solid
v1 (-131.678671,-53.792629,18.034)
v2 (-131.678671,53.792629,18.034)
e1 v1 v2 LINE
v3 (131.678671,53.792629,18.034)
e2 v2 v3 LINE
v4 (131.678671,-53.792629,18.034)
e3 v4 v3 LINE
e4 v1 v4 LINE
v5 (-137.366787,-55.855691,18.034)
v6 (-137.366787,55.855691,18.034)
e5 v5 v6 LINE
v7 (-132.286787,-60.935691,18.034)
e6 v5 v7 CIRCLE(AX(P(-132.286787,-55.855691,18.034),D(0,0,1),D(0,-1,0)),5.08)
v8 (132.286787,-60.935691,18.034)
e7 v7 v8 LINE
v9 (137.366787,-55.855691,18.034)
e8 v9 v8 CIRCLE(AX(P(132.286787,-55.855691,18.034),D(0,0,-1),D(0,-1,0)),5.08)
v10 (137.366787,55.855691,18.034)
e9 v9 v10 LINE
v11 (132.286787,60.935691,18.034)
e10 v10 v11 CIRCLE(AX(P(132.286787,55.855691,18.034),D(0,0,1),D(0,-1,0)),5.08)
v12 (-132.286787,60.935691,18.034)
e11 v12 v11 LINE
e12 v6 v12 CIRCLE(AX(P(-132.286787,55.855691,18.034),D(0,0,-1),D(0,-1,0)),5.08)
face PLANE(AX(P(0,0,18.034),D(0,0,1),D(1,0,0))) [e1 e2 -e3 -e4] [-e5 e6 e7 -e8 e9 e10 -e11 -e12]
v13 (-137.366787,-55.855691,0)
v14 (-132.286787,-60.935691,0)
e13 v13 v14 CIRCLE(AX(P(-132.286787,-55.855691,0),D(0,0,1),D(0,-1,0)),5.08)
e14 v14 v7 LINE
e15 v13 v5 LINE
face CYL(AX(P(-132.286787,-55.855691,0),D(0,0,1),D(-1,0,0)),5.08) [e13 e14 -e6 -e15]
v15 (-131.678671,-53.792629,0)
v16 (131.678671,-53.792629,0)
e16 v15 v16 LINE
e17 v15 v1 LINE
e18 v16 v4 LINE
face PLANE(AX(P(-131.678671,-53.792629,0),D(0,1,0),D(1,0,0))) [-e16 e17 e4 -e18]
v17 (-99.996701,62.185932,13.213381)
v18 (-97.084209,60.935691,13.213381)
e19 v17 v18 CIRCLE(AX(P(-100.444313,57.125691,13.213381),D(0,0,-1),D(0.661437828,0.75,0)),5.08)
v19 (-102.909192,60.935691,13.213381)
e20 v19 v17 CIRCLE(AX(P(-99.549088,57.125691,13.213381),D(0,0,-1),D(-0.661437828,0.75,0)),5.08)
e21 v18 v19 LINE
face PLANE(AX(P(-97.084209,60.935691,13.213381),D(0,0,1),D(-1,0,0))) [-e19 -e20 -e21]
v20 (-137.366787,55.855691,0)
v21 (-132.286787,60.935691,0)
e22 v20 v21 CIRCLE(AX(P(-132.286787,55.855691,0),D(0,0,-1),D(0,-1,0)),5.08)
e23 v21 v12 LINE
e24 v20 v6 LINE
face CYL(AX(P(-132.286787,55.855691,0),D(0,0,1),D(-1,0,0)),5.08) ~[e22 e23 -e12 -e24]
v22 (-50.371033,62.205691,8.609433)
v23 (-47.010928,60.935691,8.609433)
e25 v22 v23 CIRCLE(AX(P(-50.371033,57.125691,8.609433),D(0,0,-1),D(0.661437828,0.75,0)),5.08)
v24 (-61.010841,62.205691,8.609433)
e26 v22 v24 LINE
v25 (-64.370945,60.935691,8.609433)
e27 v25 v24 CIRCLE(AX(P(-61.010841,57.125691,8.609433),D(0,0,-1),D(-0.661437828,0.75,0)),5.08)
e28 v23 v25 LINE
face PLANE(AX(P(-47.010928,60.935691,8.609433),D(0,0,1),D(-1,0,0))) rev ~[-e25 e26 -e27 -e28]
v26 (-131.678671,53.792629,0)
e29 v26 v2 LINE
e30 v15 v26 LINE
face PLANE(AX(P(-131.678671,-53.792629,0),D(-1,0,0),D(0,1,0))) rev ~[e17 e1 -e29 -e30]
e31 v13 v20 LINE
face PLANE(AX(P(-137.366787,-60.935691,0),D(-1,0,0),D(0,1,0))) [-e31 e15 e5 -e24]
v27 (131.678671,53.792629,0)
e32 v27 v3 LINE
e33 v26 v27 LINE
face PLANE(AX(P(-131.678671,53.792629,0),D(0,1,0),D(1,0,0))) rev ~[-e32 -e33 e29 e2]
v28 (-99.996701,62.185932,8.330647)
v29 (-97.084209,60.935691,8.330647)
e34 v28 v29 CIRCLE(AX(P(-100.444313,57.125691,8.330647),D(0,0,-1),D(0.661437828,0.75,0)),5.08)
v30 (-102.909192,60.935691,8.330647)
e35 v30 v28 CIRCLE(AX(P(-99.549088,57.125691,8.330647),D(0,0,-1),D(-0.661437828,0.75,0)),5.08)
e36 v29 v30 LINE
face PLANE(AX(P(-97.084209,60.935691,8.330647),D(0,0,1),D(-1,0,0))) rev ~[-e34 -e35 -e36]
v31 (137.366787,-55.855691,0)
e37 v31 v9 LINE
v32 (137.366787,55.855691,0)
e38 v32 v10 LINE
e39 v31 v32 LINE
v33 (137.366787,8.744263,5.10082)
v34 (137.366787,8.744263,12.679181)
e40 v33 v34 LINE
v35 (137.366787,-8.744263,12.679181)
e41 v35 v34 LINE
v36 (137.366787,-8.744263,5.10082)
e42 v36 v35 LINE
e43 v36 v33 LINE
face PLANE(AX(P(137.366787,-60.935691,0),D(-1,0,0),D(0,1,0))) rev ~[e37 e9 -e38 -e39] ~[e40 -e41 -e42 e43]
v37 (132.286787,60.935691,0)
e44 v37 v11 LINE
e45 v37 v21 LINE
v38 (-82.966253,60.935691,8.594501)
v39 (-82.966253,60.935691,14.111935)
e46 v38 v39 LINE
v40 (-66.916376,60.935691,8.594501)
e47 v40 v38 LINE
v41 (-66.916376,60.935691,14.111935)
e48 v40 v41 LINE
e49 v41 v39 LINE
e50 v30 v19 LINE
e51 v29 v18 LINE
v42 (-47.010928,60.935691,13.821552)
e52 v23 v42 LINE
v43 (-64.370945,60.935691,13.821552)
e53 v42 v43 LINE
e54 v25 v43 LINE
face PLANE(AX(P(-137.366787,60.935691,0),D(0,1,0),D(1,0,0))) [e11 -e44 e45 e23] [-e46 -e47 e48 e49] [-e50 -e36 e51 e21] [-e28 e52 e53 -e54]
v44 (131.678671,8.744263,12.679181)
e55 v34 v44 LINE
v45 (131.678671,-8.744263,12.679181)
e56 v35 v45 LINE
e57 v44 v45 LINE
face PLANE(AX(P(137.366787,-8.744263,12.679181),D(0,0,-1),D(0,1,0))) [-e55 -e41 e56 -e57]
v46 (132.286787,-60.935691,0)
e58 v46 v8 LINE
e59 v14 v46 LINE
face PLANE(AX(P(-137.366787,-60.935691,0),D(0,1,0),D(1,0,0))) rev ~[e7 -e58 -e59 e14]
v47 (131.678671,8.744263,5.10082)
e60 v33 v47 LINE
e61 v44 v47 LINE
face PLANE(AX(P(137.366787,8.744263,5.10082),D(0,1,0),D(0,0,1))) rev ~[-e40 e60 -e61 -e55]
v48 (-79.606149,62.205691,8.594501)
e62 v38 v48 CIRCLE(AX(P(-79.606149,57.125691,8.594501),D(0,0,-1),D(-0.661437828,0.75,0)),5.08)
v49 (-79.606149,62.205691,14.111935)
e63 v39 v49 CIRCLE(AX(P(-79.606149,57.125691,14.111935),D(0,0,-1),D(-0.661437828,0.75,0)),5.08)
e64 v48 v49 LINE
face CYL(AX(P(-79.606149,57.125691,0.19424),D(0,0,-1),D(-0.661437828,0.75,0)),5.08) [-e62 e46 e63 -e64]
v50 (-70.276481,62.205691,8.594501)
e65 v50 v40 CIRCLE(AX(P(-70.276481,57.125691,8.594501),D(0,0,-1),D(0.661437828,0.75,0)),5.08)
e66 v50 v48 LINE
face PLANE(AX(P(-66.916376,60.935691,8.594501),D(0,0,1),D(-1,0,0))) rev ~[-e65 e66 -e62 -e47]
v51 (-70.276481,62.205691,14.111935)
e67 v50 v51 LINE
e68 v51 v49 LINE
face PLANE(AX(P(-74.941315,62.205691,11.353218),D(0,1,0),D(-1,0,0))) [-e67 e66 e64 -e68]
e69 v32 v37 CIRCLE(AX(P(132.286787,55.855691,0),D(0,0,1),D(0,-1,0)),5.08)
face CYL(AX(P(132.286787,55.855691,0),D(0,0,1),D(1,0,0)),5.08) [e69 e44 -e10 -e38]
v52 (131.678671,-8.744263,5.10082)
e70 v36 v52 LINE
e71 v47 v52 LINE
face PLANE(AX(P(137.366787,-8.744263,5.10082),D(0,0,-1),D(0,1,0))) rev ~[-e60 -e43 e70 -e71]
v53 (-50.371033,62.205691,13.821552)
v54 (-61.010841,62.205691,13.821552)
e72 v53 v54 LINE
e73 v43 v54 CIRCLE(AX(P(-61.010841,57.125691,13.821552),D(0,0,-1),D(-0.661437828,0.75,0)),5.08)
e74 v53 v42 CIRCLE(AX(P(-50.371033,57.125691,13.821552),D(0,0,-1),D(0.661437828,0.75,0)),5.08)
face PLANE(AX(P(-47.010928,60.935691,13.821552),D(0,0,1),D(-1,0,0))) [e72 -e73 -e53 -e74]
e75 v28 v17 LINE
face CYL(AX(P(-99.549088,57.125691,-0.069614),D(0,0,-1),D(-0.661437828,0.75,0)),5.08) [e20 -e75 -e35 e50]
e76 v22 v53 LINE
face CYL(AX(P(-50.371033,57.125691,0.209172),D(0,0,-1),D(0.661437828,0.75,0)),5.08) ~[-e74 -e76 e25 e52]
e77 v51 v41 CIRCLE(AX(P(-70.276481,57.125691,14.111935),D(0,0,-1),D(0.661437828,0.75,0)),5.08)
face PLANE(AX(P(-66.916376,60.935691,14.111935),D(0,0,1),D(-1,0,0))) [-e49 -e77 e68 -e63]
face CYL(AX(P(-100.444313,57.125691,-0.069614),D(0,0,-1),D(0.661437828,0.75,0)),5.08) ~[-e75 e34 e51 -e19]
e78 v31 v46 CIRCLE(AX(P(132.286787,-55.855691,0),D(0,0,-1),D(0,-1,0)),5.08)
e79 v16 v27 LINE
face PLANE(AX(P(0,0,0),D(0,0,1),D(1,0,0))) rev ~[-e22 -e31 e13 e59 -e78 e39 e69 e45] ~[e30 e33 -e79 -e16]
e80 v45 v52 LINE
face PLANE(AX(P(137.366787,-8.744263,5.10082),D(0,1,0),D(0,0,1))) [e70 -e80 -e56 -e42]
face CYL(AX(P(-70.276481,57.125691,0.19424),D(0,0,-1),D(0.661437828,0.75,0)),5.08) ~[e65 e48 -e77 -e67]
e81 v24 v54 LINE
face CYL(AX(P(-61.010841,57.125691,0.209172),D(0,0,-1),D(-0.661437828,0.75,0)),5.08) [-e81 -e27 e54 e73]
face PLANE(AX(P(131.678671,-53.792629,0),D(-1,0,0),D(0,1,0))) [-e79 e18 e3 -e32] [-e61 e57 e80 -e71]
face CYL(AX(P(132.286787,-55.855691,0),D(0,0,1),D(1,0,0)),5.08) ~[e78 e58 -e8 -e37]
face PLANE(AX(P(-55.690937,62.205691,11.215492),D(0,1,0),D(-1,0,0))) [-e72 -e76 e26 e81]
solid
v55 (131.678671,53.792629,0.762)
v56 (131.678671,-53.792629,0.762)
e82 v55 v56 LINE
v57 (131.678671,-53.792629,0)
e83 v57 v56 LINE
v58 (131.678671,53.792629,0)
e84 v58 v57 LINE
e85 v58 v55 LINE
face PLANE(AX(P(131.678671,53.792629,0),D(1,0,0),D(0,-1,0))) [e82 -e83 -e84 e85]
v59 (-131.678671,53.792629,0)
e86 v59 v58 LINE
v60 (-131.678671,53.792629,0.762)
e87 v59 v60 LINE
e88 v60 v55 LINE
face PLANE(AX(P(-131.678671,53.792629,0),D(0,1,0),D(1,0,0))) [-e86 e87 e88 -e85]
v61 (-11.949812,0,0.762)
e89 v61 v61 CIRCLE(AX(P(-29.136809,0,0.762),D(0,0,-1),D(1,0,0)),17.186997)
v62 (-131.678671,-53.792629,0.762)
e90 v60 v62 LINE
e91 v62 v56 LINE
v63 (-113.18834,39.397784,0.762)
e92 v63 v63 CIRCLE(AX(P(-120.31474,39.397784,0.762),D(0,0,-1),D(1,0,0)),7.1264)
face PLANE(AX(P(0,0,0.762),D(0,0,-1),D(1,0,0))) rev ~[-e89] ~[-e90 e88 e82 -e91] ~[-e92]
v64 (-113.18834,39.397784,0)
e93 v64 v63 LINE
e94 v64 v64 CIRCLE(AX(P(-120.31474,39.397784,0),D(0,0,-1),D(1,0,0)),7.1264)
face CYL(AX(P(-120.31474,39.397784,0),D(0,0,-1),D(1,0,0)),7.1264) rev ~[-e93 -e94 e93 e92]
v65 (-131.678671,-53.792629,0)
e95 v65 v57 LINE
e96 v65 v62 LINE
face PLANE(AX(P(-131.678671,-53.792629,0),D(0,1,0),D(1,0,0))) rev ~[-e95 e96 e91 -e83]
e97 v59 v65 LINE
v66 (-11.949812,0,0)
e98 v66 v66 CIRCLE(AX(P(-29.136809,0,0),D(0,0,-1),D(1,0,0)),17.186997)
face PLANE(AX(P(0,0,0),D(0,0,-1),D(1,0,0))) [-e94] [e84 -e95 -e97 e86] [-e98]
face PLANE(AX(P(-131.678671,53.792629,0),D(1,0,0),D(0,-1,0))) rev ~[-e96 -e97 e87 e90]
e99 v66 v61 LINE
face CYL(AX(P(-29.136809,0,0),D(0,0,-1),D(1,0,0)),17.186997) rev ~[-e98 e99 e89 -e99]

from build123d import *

# Parameters (mm, degrees)
F0_W        = 274.7335731983
F0_H        = 121.8713819981
F0_W_2      = 263.3573412895
F0_H_2      = 107.5852587819
F1_DEPTH    = 18.034
F2_W        = 263.3573412895
F2_H        = 107.5852587819
F2_R        = 7.1263998647
F2_R_2      = 17.1869969205
F3_DEPTH    = 0.762
F4_W        = 17.4885261804
F4_H        = 7.5783608481
F5_DEPTH    = 25.4
F6_W        = 17.3600167036
F6_H        = 5.2121188492
F6_W_2      = 16.0498768091
F6_H_2      = 5.5174343288
F6_W_3      = 5.82498312
F6_H_3      = 4.8827342689
F7_DEPTH    = 1.27
F8_T1_DEPTH = 22.0126396744
F8_T3_DEPTH = 22.3179551541
F8_T5_DEPTH = 21.6832550942
F9_R        = 5.08
F11_DEPTH   = 151.384


# Not quite as in the source:
# - a fillet or chamfer that OpenCascade refuses, or shapes differently, is made with other operations: its cross-section is extruded or revolved along the edge and cut away or added


with BuildPart() as f1:
    # F0 (on Top) → F1 (new body)
    with BuildSketch(Plane.XY):
        Rectangle(F0_W, F0_H)
        Rectangle(F0_W_2, F0_H_2, mode=Mode.SUBTRACT)
    extrude(amount=F1_DEPTH)

    # F4 (on face) → F5 (cut)
    with BuildSketch(Plane.YZ.offset(137.3667865992)):
        with Locations((0, 8.890000172)):
            Rectangle(F4_W, F4_H)
    extrude(amount=-F5_DEPTH, mode=Mode.SUBTRACT)

    # F6 (on face) → F7 (join)
    with BuildSketch(Plane(origin=(0, 60.935690999, 0), x_dir=(-1, 0, 0), z_dir=(0, 1, 0))):
        with Locations((55.6909367442, 11.2154921517)):
            Rectangle(F6_W, F6_H)
        with Locations((74.9413147569, 11.3532179967)):
            Rectangle(F6_W_2, F6_H_2)
        with Locations((99.9967008829, 10.7720140368)):
            Rectangle(F6_W_3, F6_H_3)
    extrude(amount=F7_DEPTH)

    # F8: fillet of radius 5.08 on 6 edges, made by hand

    # F8_s2 → F8_t1 (cut)
    with BuildSketch(Plane.XY.offset(0.2091723145)):
        with BuildLine():
            ThreePointArc((-47.0109283924, 60.935690999), (-48.5749813332, 61.8775958802), (-50.3710325575, 62.205690999))
            Line((-50.3710325575, 62.205690999), (-47.0109283924, 62.205690999))
            Line((-47.0109283924, 62.205690999), (-47.0109283924, 60.935690999))
        make_face()
        with BuildLine():
            ThreePointArc((-64.370945096, 60.935690999), (-62.8068921552, 61.8775958802), (-61.010840931, 62.205690999))
            Line((-61.010840931, 62.205690999), (-64.370945096, 62.205690999))
            Line((-64.370945096, 62.205690999), (-64.370945096, 60.935690999))
        make_face()
    extrude(amount=F8_T1_DEPTH, mode=Mode.SUBTRACT)

    # F8_s4 → F8_t3 (cut)
    with BuildSketch(Plane.XY.offset(0.1942404196)):
        with BuildLine():
            ThreePointArc((-66.9163763523, 60.935690999), (-68.4804292931, 61.8775958802), (-70.2764805174, 62.205690999))
            Line((-70.2764805174, 62.205690999), (-66.9163763523, 62.205690999))
            Line((-66.9163763523, 62.205690999), (-66.9163763523, 60.935690999))
        make_face()
        with BuildLine():
            ThreePointArc((-82.9662531614, 60.935690999), (-81.4022002206, 61.8775958802), (-79.6061489964, 62.205690999))
            Line((-79.6061489964, 62.205690999), (-82.9662531614, 62.205690999))
            Line((-82.9662531614, 62.205690999), (-82.9662531614, 60.935690999))
        make_face()
    extrude(amount=F8_T3_DEPTH, mode=Mode.SUBTRACT)

    # F8_s6 → F8_t5 (cut)
    with BuildSketch(Plane.XY.offset(-0.0696135103)):
        with BuildLine():
            ThreePointArc((-102.9091924429, 60.935690999), (-101.3451395021, 61.8775958802), (-99.5490882778, 62.205690999))
            Line((-99.5490882778, 62.205690999), (-102.9091924429, 62.205690999))
            Line((-102.9091924429, 62.205690999), (-102.9091924429, 60.935690999))
        make_face()
        with BuildLine():
            ThreePointArc((-97.0842093229, 60.935690999), (-98.6482622638, 61.8775958802), (-100.444313488, 62.205690999))
            Line((-100.444313488, 62.205690999), (-97.0842093229, 62.205690999))
            Line((-97.0842093229, 62.205690999), (-97.0842093229, 60.935690999))
        make_face()
    extrude(amount=F8_T5_DEPTH, mode=Mode.SUBTRACT)

    # F9
    f9_edges = [f1.edges().sort_by_distance(p)[0] for p in [
        (-137.366787, 60.935691, 9.017),
        (137.366787, 60.935691, 9.017),
        (137.366787, -60.935691, 9.017),
        (-137.366787, -60.935691, 9.017),
    ]]
    fillet(f9_edges, radius=F9_R)

    # F10 (on face) → F11 (cut)
    with BuildSketch(Plane(origin=(0, 0, 0), x_dir=(1, 0, 0), z_dir=(0, 0, -1))):
        with BuildLine():
            ThreePointArc((-31.5201184515, 17.0209487763), (-31.5092102693, 17.2773055673), (-31.5055732342, 17.5338685513))
            ThreePointArc((-31.5055732342, 17.5338685513), (-45.7092261373, 24.9750704372), (-43.7409795354, 9.0615150012))
            ThreePointArc((-43.7409795354, 9.0615150012), (-38.5166685327, 14.4017738694), (-31.5201184515, 17.0209487763))
        make_face()
    extrude(amount=F11_DEPTH, mode=Mode.SUBTRACT)


with BuildPart() as f3:
    # F2 (on face) → F3 (new body)
    with BuildSketch(Plane(origin=(0, 0, 0), x_dir=(1, 0, 0), z_dir=(0, 0, -1))):
        Rectangle(F2_W, F2_H)
        with Locations((-120.3147396445, -39.3977835774)):
            Circle(F2_R, mode=Mode.SUBTRACT)
        with Locations((-29.1368085891, 0)):
            Circle(F2_R_2, mode=Mode.SUBTRACT)
    extrude(amount=-F3_DEPTH)


solid = Compound([f1.part, f3.part])
